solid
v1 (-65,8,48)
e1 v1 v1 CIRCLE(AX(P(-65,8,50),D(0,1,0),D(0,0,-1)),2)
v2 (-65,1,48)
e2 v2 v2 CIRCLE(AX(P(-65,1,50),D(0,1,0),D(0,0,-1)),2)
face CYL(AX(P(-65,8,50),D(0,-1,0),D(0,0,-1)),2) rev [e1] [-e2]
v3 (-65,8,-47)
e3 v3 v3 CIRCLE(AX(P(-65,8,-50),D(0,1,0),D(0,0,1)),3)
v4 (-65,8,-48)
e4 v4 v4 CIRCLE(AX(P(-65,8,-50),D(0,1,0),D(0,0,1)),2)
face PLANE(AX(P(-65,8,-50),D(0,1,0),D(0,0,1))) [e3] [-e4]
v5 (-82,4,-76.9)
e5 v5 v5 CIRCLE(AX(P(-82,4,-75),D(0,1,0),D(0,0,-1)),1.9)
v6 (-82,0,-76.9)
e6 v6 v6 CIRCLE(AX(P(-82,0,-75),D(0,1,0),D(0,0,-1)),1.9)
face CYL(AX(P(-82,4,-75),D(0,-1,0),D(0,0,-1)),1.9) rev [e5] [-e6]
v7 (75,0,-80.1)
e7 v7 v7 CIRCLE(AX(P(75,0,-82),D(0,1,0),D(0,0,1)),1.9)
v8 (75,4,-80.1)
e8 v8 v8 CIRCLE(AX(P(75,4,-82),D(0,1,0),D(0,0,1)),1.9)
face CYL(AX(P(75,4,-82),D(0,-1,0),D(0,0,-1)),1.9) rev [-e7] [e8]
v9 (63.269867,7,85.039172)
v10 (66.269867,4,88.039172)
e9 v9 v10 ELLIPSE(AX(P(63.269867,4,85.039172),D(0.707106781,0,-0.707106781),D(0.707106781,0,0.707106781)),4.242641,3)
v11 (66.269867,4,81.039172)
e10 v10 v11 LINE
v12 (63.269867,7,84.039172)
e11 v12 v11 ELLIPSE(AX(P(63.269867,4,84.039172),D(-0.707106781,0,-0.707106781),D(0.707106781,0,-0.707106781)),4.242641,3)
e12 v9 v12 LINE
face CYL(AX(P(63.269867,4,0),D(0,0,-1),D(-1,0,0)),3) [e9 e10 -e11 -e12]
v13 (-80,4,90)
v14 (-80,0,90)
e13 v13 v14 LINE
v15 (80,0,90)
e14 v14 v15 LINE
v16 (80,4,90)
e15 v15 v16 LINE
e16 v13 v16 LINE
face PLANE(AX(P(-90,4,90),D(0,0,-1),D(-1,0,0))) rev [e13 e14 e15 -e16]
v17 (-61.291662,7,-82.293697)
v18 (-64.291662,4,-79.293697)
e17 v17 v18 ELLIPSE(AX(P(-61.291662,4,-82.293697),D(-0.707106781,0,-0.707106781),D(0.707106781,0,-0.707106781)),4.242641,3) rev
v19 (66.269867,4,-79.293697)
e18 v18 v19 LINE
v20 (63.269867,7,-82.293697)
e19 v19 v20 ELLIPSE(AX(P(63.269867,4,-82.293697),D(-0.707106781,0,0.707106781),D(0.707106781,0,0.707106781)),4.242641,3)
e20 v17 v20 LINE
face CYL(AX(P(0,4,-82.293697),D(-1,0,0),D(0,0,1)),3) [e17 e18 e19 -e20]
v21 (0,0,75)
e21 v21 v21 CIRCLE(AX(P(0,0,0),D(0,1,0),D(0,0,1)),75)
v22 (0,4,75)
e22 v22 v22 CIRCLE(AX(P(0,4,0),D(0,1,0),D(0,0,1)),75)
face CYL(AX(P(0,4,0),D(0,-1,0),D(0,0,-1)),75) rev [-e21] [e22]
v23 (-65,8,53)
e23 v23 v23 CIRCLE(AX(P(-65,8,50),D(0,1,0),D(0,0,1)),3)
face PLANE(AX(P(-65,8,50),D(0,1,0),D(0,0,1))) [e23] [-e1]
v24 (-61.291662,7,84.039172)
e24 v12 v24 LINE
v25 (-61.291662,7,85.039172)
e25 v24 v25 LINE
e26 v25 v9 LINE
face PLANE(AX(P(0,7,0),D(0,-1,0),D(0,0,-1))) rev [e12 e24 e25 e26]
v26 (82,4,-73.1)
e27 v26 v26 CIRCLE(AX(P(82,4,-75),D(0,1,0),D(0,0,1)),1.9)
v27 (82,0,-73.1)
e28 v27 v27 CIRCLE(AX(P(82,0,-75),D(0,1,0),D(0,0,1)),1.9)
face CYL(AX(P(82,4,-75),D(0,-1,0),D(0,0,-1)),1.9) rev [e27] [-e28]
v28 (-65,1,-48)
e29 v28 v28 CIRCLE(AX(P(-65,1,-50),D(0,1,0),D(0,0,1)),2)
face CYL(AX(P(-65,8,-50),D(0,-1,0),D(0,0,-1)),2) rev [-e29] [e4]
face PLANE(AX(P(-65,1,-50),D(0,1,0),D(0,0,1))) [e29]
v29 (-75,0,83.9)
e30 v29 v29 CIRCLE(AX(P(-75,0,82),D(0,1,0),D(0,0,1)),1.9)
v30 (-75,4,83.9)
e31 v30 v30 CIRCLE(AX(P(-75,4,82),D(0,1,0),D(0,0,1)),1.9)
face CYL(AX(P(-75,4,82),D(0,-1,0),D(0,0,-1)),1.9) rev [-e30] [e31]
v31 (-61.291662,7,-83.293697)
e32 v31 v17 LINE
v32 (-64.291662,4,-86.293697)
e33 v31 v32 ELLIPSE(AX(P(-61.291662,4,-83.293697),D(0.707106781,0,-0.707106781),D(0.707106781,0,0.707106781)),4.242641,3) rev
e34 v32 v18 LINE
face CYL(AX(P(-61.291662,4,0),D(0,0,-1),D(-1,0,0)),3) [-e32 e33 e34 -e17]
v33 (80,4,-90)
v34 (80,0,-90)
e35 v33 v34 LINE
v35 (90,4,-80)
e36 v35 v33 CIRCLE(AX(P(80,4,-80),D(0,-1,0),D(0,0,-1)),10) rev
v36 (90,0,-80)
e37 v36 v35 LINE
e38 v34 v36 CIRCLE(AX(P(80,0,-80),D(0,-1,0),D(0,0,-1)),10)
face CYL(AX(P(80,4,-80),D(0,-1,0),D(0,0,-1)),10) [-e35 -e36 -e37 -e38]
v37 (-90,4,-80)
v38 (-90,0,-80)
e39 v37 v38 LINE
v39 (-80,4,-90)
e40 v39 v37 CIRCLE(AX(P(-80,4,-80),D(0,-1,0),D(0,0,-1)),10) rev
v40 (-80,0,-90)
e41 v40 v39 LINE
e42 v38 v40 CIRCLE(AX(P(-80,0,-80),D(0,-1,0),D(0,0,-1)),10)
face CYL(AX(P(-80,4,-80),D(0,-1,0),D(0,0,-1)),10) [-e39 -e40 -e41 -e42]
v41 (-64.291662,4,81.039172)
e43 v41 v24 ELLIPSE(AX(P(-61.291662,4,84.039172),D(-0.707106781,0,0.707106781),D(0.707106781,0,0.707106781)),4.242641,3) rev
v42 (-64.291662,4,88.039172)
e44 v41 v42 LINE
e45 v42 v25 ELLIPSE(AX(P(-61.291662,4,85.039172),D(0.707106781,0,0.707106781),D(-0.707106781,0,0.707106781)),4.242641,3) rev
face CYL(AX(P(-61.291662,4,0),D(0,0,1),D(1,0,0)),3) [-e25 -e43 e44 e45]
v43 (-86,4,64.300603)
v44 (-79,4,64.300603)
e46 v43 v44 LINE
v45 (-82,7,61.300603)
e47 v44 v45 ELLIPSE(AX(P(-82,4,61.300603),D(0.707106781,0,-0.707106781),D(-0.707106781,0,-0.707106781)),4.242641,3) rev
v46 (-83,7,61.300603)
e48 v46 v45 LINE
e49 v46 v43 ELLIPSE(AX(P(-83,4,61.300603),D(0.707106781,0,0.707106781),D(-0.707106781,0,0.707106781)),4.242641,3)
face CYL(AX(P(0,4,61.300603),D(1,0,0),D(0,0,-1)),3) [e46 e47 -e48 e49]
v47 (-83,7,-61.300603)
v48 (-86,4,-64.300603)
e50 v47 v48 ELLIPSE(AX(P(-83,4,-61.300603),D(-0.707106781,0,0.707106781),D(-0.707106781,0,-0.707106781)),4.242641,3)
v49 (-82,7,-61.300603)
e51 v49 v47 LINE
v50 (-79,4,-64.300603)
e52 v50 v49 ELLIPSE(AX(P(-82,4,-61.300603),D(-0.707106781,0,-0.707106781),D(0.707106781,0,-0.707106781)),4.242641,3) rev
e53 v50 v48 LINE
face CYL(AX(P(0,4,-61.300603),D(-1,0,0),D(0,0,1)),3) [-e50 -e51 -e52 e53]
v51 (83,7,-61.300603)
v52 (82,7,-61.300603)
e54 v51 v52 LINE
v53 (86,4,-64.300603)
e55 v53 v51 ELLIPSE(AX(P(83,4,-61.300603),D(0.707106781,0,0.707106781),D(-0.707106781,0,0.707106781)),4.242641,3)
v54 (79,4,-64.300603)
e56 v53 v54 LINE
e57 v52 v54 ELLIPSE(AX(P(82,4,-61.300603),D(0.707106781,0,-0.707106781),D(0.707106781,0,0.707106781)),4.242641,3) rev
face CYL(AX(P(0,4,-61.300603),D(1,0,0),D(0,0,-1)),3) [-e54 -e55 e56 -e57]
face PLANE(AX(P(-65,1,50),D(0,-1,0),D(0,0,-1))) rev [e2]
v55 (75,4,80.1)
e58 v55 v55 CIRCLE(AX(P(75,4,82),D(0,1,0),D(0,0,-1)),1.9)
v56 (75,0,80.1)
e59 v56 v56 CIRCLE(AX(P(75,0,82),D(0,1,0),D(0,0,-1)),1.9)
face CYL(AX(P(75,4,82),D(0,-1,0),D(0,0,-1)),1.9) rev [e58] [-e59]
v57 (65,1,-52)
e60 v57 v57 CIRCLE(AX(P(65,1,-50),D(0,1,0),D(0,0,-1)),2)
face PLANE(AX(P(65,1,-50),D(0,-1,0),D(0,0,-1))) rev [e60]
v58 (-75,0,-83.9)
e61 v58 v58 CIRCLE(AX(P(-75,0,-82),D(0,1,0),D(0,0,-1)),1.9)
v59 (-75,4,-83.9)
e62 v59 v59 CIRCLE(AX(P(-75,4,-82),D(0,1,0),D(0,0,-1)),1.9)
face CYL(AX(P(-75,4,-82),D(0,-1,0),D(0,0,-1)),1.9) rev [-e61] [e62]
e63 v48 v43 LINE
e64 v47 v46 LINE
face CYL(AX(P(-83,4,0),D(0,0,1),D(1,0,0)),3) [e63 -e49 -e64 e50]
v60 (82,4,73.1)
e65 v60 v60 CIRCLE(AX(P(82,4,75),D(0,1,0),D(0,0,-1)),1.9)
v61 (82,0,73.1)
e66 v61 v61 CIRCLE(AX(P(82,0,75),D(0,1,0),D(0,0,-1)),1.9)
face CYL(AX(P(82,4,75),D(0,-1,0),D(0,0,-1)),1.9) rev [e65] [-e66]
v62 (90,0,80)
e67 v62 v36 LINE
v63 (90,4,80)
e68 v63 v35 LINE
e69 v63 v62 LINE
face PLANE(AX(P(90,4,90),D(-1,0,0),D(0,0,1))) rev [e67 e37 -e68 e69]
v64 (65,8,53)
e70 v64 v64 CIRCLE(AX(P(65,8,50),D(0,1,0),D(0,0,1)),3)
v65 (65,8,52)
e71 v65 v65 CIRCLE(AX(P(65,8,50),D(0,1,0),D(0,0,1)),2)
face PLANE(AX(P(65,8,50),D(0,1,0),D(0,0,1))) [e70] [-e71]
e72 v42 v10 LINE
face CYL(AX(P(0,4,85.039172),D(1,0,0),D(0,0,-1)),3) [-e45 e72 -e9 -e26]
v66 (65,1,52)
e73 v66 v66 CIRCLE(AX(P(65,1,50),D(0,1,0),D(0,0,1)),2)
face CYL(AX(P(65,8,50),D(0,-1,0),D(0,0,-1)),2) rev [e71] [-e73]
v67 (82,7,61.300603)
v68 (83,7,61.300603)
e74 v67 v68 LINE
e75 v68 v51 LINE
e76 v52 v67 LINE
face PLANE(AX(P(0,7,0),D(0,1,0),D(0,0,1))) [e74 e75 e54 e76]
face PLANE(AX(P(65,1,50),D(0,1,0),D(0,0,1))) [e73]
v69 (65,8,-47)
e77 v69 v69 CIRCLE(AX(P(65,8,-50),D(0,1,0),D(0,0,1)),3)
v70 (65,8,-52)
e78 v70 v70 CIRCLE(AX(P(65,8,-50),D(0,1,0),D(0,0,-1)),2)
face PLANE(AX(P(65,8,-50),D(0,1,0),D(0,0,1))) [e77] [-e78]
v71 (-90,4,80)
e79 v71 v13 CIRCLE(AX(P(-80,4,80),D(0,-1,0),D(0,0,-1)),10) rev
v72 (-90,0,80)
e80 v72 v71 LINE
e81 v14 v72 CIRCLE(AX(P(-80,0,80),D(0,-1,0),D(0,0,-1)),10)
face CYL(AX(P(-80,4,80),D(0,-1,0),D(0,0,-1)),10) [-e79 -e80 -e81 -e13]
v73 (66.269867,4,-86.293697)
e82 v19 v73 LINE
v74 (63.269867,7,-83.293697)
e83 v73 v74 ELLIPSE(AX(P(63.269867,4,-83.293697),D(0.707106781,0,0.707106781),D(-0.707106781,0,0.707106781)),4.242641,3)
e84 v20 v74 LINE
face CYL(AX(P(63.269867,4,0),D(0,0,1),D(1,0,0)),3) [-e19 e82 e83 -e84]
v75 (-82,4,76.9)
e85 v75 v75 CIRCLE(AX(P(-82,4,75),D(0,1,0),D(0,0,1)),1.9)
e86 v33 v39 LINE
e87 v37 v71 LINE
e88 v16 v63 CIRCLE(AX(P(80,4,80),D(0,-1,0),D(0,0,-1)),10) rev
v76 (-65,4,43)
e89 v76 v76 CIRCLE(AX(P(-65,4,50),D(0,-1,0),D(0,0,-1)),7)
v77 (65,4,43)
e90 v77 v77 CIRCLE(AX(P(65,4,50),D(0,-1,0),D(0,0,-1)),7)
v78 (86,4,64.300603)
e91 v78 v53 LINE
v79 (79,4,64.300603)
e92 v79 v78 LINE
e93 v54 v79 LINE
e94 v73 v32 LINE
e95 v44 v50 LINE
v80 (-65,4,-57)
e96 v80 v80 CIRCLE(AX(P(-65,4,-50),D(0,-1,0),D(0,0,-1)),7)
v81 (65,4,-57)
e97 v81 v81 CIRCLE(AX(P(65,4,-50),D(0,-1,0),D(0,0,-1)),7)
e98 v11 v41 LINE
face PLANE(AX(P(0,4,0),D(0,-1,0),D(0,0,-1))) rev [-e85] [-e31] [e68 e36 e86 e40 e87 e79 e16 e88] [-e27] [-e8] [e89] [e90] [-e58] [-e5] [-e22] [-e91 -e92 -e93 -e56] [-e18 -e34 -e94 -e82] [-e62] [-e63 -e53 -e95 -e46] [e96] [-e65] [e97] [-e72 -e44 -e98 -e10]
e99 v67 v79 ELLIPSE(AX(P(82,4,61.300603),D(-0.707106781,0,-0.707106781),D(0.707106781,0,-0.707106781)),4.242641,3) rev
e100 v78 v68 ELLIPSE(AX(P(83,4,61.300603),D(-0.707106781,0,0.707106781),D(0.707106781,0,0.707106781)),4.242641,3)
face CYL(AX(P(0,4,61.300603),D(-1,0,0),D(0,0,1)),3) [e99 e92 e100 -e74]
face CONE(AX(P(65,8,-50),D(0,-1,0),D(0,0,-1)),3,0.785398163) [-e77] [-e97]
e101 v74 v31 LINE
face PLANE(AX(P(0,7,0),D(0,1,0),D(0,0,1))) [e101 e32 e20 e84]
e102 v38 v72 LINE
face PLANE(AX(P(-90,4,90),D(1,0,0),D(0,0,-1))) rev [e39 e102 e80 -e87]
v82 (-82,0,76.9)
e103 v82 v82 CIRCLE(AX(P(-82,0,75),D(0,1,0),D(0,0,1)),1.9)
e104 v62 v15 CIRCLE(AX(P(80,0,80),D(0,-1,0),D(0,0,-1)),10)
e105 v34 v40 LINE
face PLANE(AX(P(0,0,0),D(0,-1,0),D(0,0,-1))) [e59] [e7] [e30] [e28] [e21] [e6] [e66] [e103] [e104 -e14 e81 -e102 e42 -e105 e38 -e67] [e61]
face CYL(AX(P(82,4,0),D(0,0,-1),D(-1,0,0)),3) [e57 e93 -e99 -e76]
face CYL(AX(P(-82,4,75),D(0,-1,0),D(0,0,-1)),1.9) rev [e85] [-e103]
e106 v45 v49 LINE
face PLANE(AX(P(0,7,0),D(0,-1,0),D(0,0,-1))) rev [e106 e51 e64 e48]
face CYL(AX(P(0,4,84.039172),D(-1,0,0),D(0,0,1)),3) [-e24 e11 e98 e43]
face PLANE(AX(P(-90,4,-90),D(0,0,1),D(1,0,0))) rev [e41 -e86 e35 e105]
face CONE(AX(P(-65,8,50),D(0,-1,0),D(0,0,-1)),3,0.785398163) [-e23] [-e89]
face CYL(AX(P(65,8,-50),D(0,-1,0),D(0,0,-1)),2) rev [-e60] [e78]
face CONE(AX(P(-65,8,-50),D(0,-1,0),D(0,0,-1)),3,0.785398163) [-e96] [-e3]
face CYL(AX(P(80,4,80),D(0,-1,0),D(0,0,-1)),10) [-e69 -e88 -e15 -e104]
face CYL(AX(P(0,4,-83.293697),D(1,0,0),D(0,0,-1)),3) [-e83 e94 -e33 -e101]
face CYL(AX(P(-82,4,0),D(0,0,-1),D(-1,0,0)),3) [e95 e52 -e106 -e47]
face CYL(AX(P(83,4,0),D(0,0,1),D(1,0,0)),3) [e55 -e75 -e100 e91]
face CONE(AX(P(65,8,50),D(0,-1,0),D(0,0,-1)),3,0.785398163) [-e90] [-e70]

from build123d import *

# Parameters (mm, degrees)
SKETCH_1_W          = 180
SKETCH_1_H          = 180
SKETCH_1_R          = 1.9
SKETCH_1_R_2        = 75
EXTRUDE_1_DEPTH     = 4
FILLET_1_R          = 10
SKETCH_2_R          = 3
SKETCH_2_R_2        = 2
EXTRUDE_2_DEPTH     = 4
CHAMFER_1_SIZE      = 4
CUT_EXTRUDE_START   = -7
SKETCH_3_R          = 2
CUT_EXTRUDE_1_DEPTH = 7
SKETCH_4_W          = 7
SKETCH_4_H          = 128.601205204
SKETCH_4_W_2        = 130.561529492
SKETCH_4_H_2        = 7
EXTRUDE_3_DEPTH     = 3
FILLET_2_R          = 3


with BuildPart() as part:
    # Эскиз1 → Бобышка-Вытянуть1 (new body)
    with BuildSketch(Plane(origin=(0, 0, 0), x_dir=(1, 0, 0), z_dir=(0, 1, 0))):
        Rectangle(SKETCH_1_W, SKETCH_1_H)
        with Locations(Location((75, 82, 0), (0, 0, 270))):
            Circle(SKETCH_1_R, mode=Mode.SUBTRACT)
        with Locations(Location((82, 75, 0), (0, 0, 270))):
            Circle(SKETCH_1_R, mode=Mode.SUBTRACT)
        with Locations(Location((-82, 75, 0), (0, 0, 90))):
            Circle(SKETCH_1_R, mode=Mode.SUBTRACT)
        with Locations(Location((-75, 82, 0), (0, 0, 90))):
            Circle(SKETCH_1_R, mode=Mode.SUBTRACT)
        with Locations(Location((-82, -75, 0), (0, 0, 270))):
            Circle(SKETCH_1_R, mode=Mode.SUBTRACT)
        with Locations(Location((-75, -82, 0), (0, 0, 270))):
            Circle(SKETCH_1_R, mode=Mode.SUBTRACT)
        with Locations(Location((75, -82, 0), (0, 0, 90))):
            Circle(SKETCH_1_R, mode=Mode.SUBTRACT)
        with Locations(Location((82, -75, 0), (0, 0, 90))):
            Circle(SKETCH_1_R, mode=Mode.SUBTRACT)
        with Locations(Location((0, 0, 0), (0, 0, 270))):
            Circle(SKETCH_1_R_2, mode=Mode.SUBTRACT)
    extrude(amount=EXTRUDE_1_DEPTH)

    # Скругление1
    fillet_1_edges = [part.edges().sort_by_distance(p)[0] for p in [
        (90, 2, 90),
        (-90, 2, 90),
        (-90, 2, -90),
        (90, 2, -90),
    ]]
    fillet(fillet_1_edges, radius=FILLET_1_R)

    # Эскиз2 → Бобышка-Вытянуть2 (add)
    # profile 1 of 4: a face of its own
    with BuildSketch(Plane(origin=(0, 4, 0), x_dir=(1, 0, 0), z_dir=(0, 1, 0))):
        with Locations(Location((-65, 50, 0), (0, 0, 90))):
            Circle(SKETCH_2_R)
        with Locations(Location((-65, 50, 0), (0, 0, 270))):
            Circle(SKETCH_2_R_2, mode=Mode.SUBTRACT)
    # profile 2 of 4: a face of its own
    with BuildSketch(Plane(origin=(0, 4, 0), x_dir=(1, 0, 0), z_dir=(0, 1, 0))):
        with Locations(Location((65, 50, 0), (0, 0, 90))):
            Circle(SKETCH_2_R)
        with Locations(Location((65, 50, 0), (0, 0, 90))):
            Circle(SKETCH_2_R_2, mode=Mode.SUBTRACT)
    # profile 3 of 4: a face of its own
    with BuildSketch(Plane(origin=(0, 4, 0), x_dir=(1, 0, 0), z_dir=(0, 1, 0))):
        with Locations(Location((65, -50, 0), (0, 0, 90))):
            Circle(SKETCH_2_R)
        with Locations(Location((65, -50, 0), (0, 0, 270))):
            Circle(SKETCH_2_R_2, mode=Mode.SUBTRACT)
    # profile 4 of 4: a face of its own
    with BuildSketch(Plane(origin=(0, 4, 0), x_dir=(1, 0, 0), z_dir=(0, 1, 0))):
        with Locations(Location((-65, -50, 0), (0, 0, 90))):
            Circle(SKETCH_2_R)
        with Locations(Location((-65, -50, 0), (0, 0, 90))):
            Circle(SKETCH_2_R_2, mode=Mode.SUBTRACT)
    extrude(amount=EXTRUDE_2_DEPTH)

    # Фаска1
    chamfer_1_edges = [part.edges().sort_by_distance(p)[0] for p in [
        (-65, 4, -47),
        (65, 4, -47),
        (65, 4, 53),
        (-65, 4, 53),
    ]]
    chamfer(chamfer_1_edges, length=CHAMFER_1_SIZE - 0.0001)  # a hair under: the kernel refuses the full size

    # Эскиз3 → Вырез-Вытянуть1 (cut)
    with BuildSketch(Plane(origin=(0, 8, 0), x_dir=(1, 0, 0), z_dir=(0, 1, 0)).offset(CUT_EXTRUDE_START)):
        with Locations(Location((-65, 50, 0), (0, 0, 270))):
            Circle(SKETCH_3_R)
        with Locations(Location((65, 50, 0), (0, 0, 90))):
            Circle(SKETCH_3_R)
        with Locations(Location((65, -50, 0), (0, 0, 270))):
            Circle(SKETCH_3_R)
        with Locations(Location((-65, -50, 0), (0, 0, 90))):
            Circle(SKETCH_3_R)
    extrude(amount=CUT_EXTRUDE_1_DEPTH, mode=Mode.SUBTRACT)

    # Эскиз4 → Бобышка-Вытянуть3 (add)
    with BuildSketch(Plane(origin=(0, 4, 0), x_dir=(1, 0, 0), z_dir=(0, 1, 0))):
        with Locations((-82.5, 0)):
            Rectangle(SKETCH_4_W, SKETCH_4_H)
        with Locations((82.5, 0)):
            Rectangle(SKETCH_4_W, SKETCH_4_H)
        with Locations((0.989102496, -84.539172171)):
            Rectangle(SKETCH_4_W_2, SKETCH_4_H_2)
        with Locations((0.989102496, 82.793697178)):
            Rectangle(SKETCH_4_W_2, SKETCH_4_H_2)
    extrude(amount=EXTRUDE_3_DEPTH)

    # Скругление2
    fillet_2_edges = [part.edges().sort_by_distance(p)[0] for p in [
        (-82.5, 7, 64.300602602),
        (-86, 7, 0),
        (-82.5, 7, -64.300602602),
        (-79, 7, 0),
        (0.989102496, 7, 81.039172171),
        (66.269867242, 7, 84.539172171),
        (0.989102496, 7, 88.039172171),
        (-64.29166225, 7, 84.539172171),
        (82.5, 7, 64.300602602),
        (79, 7, 0),
        (82.5, 7, -64.300602602),
        (86, 7, 0),
        (0.989102496, 7, -79.293697178),
        (-64.29166225, 7, -82.793697178),
        (0.989102496, 7, -86.293697178),
        (66.269867242, 7, -82.793697178),
    ]]
    fillet(fillet_2_edges, radius=FILLET_2_R - 0.0001)  # a hair under: the kernel refuses the full size


solid = part.part
